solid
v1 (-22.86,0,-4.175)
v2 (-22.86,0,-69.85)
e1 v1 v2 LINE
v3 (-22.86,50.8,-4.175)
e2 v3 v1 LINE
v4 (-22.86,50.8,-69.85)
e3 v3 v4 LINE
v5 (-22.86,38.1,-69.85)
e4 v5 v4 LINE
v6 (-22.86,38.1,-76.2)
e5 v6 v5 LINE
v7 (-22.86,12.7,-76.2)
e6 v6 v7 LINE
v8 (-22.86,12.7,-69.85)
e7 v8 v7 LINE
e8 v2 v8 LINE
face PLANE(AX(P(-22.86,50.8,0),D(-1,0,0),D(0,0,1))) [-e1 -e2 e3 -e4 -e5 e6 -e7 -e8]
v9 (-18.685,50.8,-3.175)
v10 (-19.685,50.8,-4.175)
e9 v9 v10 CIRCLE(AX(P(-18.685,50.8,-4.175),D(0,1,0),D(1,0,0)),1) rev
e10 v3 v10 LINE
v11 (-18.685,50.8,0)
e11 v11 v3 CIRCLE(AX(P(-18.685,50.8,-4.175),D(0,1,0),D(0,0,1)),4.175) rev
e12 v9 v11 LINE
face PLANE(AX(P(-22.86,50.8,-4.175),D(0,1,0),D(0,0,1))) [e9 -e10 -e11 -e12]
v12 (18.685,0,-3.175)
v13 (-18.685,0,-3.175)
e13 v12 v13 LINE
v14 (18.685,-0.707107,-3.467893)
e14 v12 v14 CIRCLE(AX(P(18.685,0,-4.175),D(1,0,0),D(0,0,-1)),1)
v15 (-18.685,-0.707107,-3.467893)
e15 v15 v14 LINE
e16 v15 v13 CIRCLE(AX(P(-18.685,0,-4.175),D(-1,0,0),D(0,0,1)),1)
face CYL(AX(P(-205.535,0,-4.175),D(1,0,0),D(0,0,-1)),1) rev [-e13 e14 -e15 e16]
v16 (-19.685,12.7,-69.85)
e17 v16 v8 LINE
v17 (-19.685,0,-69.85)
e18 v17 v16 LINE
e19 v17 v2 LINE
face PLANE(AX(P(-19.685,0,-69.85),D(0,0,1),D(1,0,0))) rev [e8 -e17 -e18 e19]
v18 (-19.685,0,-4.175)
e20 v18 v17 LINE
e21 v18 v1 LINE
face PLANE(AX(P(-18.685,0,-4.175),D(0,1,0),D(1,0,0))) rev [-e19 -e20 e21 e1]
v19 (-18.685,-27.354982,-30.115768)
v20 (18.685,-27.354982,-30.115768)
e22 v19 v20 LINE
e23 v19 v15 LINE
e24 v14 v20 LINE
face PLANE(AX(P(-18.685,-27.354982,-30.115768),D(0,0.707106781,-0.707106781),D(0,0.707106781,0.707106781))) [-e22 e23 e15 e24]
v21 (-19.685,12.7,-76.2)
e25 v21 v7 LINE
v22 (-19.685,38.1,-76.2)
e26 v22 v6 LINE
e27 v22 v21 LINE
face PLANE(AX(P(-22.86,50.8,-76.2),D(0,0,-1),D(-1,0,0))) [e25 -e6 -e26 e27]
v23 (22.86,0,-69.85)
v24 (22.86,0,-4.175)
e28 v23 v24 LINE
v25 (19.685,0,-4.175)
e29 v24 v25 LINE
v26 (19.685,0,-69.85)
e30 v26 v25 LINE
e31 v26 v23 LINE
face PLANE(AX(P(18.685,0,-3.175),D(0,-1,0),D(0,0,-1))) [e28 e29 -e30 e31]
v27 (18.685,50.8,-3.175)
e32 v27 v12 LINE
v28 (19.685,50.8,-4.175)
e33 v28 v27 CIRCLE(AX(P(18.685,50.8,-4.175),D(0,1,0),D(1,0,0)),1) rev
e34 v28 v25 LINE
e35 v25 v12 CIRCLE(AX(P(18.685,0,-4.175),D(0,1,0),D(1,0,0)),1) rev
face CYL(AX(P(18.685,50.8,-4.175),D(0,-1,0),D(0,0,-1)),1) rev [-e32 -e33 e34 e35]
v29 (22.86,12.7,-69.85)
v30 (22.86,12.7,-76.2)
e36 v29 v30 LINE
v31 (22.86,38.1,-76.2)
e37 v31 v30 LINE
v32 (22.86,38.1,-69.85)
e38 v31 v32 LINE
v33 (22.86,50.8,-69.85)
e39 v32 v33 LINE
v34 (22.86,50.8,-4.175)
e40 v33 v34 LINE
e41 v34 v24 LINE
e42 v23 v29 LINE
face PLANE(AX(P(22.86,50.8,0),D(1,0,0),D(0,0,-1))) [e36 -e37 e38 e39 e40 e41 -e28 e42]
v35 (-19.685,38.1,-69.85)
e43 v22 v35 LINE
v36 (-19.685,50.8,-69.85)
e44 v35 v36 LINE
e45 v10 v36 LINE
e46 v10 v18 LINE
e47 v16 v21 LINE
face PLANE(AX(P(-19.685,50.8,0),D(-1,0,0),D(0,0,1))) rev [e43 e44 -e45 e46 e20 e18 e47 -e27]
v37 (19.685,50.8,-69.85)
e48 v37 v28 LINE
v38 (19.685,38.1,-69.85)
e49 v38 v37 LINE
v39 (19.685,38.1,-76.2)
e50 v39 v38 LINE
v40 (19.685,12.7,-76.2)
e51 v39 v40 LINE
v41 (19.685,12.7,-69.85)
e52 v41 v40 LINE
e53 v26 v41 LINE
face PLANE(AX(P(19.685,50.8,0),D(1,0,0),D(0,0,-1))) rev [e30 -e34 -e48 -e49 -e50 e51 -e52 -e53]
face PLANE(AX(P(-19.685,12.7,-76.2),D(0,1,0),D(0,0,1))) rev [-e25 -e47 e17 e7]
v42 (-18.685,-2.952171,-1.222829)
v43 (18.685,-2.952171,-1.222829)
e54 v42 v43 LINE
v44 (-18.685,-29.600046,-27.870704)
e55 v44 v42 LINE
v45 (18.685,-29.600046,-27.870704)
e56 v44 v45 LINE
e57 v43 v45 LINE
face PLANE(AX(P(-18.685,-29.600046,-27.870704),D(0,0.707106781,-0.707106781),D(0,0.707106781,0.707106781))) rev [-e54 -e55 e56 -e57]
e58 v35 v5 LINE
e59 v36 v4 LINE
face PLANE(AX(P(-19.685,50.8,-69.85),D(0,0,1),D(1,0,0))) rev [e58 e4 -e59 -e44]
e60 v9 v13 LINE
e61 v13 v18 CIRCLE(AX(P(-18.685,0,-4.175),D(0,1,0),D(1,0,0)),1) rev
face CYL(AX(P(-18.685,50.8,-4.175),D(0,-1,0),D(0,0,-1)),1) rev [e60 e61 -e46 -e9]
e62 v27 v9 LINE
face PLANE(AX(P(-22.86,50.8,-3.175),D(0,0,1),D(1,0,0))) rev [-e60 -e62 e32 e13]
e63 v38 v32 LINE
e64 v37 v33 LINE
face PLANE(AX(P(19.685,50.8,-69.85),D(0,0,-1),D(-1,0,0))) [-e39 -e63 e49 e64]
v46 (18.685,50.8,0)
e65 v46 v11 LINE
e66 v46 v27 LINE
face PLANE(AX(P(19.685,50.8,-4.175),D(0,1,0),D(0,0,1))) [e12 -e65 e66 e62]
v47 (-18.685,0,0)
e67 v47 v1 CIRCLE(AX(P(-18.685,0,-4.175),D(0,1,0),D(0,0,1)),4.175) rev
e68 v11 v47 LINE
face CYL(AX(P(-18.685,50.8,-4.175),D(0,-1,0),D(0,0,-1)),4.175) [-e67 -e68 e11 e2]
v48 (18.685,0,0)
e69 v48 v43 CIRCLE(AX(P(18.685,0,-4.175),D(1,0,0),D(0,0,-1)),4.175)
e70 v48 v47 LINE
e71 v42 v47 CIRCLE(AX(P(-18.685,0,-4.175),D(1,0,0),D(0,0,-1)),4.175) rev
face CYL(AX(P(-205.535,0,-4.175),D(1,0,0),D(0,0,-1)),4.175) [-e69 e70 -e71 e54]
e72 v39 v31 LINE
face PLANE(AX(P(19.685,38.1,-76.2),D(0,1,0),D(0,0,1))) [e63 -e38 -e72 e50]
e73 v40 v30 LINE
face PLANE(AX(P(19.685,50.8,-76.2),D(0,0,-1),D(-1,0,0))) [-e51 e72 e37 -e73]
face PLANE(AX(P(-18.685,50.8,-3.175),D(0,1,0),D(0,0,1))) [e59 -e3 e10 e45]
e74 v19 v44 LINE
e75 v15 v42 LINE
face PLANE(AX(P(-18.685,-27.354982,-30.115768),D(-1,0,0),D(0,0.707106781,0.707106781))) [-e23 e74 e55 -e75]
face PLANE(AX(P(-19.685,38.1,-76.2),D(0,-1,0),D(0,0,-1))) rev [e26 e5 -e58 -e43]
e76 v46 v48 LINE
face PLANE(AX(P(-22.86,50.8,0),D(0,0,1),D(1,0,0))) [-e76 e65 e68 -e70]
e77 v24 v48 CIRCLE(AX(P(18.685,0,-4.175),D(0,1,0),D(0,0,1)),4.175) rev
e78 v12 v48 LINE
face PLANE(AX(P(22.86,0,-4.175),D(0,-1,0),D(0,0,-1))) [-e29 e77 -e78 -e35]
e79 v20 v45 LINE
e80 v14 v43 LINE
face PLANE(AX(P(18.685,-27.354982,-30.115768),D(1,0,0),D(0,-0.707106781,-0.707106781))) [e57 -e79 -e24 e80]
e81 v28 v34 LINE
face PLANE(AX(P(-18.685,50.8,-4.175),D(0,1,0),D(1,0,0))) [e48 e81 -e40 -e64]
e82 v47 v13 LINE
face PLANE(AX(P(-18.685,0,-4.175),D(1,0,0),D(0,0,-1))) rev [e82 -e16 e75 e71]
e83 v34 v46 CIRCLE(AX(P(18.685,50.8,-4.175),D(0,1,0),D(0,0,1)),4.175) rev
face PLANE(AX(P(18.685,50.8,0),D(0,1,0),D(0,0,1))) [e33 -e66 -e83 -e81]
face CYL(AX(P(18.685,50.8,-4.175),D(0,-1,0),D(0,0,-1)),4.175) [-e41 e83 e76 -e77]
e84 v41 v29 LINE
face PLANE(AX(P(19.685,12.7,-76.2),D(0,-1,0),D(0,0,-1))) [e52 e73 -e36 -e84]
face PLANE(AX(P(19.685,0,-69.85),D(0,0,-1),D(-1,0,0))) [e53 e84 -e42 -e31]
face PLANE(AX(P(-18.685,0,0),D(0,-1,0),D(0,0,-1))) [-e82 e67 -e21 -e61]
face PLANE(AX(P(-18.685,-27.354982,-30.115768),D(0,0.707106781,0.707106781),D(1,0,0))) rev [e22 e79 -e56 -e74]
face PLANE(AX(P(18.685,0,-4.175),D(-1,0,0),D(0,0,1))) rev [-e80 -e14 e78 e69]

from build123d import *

# Parameters (mm, degrees)
BASE_FLANGE1_DEPTH  = 50.8
MITER_START         = -18.685
MITER_FLANGE2_DEPTH = 37.37
SKETCH24_W          = 6.35
SKETCH24_H          = 12.7
CUT_EXTRUDE1_DEPTH  = 3.175


# Read off the part's stored shape, not the designer's step: Miter Flange2
# Sheet-metal steps are written as plain solids
with BuildPart() as part:
    # Sketch1 → Base-Flange1 (new body)
    with BuildSketch(Plane(origin=(0, 0, 0), x_dir=(1, 0, 0), z_dir=(0, 1, 0))):
        with BuildLine():
            Line((-22.86, 76.2), (-22.86, 4.175))
            ThreePointArc((-22.86, 4.175), (-21.637170811, 1.222829189), (-18.685, 0))
            Line((-18.685, 0), (18.685, 0))
            ThreePointArc((18.685, 0), (21.637170811, 1.222829189), (22.86, 4.175))
            Line((22.86, 4.175), (22.86, 76.2))
            Line((22.86, 76.2), (19.685, 76.2))
            Line((19.685, 76.2), (19.685, 4.175))
            ThreePointArc((19.685, 4.175), (19.392106781, 3.467893219), (18.685, 3.175))
            Line((18.685, 3.175), (-18.685, 3.175))
            ThreePointArc((-18.685, 3.175), (-19.392106781, 3.467893219), (-19.685, 4.175))
            Line((-19.685, 4.175), (-19.685, 76.2))
            Line((-19.685, 76.2), (-22.86, 76.2))
        make_face()
    extrude(amount=BASE_FLANGE1_DEPTH)

    # Miter Flange2 outline → Miter Flange2 (add)
    with BuildSketch(Plane.YZ.offset(MITER_START)):
        with BuildLine():
            Line((-29.600045956, -27.870704333), (-27.354981926, -30.115768363))
            Line((-27.354981926, -30.115768363), (-0.707106781, -3.467893219))
            ThreePointArc((-0.707106781, -3.467893219), (-0.382683432, -3.251120467), (0, -3.175))
            Line((0, -3.175), (0, 0))
            ThreePointArc((0, 0), (-1.59770333, -0.317802952), (-2.952170811, -1.222829189))
            Line((-2.952170811, -1.222829189), (-29.600045956, -27.870704333))
        make_face()
    extrude(amount=MITER_FLANGE2_DEPTH)

    # Sketch24 → Cut-Extrude1 (cut)
    with BuildSketch(Plane.ZY.offset(22.86)):
        with Locations((-73.025, 44.45)):
            Rectangle(SKETCH24_W, SKETCH24_H)
        with Locations((-73.025, 6.35)):
            Rectangle(SKETCH24_W, SKETCH24_H)
    cut_extrude1 = extrude(amount=-CUT_EXTRUDE1_DEPTH, mode=Mode.SUBTRACT)

    # Mirror2: Cut-Extrude1 across plane
    add(cut_extrude1.mirror(Plane.ZY), mode=Mode.SUBTRACT)


solid = part.part
